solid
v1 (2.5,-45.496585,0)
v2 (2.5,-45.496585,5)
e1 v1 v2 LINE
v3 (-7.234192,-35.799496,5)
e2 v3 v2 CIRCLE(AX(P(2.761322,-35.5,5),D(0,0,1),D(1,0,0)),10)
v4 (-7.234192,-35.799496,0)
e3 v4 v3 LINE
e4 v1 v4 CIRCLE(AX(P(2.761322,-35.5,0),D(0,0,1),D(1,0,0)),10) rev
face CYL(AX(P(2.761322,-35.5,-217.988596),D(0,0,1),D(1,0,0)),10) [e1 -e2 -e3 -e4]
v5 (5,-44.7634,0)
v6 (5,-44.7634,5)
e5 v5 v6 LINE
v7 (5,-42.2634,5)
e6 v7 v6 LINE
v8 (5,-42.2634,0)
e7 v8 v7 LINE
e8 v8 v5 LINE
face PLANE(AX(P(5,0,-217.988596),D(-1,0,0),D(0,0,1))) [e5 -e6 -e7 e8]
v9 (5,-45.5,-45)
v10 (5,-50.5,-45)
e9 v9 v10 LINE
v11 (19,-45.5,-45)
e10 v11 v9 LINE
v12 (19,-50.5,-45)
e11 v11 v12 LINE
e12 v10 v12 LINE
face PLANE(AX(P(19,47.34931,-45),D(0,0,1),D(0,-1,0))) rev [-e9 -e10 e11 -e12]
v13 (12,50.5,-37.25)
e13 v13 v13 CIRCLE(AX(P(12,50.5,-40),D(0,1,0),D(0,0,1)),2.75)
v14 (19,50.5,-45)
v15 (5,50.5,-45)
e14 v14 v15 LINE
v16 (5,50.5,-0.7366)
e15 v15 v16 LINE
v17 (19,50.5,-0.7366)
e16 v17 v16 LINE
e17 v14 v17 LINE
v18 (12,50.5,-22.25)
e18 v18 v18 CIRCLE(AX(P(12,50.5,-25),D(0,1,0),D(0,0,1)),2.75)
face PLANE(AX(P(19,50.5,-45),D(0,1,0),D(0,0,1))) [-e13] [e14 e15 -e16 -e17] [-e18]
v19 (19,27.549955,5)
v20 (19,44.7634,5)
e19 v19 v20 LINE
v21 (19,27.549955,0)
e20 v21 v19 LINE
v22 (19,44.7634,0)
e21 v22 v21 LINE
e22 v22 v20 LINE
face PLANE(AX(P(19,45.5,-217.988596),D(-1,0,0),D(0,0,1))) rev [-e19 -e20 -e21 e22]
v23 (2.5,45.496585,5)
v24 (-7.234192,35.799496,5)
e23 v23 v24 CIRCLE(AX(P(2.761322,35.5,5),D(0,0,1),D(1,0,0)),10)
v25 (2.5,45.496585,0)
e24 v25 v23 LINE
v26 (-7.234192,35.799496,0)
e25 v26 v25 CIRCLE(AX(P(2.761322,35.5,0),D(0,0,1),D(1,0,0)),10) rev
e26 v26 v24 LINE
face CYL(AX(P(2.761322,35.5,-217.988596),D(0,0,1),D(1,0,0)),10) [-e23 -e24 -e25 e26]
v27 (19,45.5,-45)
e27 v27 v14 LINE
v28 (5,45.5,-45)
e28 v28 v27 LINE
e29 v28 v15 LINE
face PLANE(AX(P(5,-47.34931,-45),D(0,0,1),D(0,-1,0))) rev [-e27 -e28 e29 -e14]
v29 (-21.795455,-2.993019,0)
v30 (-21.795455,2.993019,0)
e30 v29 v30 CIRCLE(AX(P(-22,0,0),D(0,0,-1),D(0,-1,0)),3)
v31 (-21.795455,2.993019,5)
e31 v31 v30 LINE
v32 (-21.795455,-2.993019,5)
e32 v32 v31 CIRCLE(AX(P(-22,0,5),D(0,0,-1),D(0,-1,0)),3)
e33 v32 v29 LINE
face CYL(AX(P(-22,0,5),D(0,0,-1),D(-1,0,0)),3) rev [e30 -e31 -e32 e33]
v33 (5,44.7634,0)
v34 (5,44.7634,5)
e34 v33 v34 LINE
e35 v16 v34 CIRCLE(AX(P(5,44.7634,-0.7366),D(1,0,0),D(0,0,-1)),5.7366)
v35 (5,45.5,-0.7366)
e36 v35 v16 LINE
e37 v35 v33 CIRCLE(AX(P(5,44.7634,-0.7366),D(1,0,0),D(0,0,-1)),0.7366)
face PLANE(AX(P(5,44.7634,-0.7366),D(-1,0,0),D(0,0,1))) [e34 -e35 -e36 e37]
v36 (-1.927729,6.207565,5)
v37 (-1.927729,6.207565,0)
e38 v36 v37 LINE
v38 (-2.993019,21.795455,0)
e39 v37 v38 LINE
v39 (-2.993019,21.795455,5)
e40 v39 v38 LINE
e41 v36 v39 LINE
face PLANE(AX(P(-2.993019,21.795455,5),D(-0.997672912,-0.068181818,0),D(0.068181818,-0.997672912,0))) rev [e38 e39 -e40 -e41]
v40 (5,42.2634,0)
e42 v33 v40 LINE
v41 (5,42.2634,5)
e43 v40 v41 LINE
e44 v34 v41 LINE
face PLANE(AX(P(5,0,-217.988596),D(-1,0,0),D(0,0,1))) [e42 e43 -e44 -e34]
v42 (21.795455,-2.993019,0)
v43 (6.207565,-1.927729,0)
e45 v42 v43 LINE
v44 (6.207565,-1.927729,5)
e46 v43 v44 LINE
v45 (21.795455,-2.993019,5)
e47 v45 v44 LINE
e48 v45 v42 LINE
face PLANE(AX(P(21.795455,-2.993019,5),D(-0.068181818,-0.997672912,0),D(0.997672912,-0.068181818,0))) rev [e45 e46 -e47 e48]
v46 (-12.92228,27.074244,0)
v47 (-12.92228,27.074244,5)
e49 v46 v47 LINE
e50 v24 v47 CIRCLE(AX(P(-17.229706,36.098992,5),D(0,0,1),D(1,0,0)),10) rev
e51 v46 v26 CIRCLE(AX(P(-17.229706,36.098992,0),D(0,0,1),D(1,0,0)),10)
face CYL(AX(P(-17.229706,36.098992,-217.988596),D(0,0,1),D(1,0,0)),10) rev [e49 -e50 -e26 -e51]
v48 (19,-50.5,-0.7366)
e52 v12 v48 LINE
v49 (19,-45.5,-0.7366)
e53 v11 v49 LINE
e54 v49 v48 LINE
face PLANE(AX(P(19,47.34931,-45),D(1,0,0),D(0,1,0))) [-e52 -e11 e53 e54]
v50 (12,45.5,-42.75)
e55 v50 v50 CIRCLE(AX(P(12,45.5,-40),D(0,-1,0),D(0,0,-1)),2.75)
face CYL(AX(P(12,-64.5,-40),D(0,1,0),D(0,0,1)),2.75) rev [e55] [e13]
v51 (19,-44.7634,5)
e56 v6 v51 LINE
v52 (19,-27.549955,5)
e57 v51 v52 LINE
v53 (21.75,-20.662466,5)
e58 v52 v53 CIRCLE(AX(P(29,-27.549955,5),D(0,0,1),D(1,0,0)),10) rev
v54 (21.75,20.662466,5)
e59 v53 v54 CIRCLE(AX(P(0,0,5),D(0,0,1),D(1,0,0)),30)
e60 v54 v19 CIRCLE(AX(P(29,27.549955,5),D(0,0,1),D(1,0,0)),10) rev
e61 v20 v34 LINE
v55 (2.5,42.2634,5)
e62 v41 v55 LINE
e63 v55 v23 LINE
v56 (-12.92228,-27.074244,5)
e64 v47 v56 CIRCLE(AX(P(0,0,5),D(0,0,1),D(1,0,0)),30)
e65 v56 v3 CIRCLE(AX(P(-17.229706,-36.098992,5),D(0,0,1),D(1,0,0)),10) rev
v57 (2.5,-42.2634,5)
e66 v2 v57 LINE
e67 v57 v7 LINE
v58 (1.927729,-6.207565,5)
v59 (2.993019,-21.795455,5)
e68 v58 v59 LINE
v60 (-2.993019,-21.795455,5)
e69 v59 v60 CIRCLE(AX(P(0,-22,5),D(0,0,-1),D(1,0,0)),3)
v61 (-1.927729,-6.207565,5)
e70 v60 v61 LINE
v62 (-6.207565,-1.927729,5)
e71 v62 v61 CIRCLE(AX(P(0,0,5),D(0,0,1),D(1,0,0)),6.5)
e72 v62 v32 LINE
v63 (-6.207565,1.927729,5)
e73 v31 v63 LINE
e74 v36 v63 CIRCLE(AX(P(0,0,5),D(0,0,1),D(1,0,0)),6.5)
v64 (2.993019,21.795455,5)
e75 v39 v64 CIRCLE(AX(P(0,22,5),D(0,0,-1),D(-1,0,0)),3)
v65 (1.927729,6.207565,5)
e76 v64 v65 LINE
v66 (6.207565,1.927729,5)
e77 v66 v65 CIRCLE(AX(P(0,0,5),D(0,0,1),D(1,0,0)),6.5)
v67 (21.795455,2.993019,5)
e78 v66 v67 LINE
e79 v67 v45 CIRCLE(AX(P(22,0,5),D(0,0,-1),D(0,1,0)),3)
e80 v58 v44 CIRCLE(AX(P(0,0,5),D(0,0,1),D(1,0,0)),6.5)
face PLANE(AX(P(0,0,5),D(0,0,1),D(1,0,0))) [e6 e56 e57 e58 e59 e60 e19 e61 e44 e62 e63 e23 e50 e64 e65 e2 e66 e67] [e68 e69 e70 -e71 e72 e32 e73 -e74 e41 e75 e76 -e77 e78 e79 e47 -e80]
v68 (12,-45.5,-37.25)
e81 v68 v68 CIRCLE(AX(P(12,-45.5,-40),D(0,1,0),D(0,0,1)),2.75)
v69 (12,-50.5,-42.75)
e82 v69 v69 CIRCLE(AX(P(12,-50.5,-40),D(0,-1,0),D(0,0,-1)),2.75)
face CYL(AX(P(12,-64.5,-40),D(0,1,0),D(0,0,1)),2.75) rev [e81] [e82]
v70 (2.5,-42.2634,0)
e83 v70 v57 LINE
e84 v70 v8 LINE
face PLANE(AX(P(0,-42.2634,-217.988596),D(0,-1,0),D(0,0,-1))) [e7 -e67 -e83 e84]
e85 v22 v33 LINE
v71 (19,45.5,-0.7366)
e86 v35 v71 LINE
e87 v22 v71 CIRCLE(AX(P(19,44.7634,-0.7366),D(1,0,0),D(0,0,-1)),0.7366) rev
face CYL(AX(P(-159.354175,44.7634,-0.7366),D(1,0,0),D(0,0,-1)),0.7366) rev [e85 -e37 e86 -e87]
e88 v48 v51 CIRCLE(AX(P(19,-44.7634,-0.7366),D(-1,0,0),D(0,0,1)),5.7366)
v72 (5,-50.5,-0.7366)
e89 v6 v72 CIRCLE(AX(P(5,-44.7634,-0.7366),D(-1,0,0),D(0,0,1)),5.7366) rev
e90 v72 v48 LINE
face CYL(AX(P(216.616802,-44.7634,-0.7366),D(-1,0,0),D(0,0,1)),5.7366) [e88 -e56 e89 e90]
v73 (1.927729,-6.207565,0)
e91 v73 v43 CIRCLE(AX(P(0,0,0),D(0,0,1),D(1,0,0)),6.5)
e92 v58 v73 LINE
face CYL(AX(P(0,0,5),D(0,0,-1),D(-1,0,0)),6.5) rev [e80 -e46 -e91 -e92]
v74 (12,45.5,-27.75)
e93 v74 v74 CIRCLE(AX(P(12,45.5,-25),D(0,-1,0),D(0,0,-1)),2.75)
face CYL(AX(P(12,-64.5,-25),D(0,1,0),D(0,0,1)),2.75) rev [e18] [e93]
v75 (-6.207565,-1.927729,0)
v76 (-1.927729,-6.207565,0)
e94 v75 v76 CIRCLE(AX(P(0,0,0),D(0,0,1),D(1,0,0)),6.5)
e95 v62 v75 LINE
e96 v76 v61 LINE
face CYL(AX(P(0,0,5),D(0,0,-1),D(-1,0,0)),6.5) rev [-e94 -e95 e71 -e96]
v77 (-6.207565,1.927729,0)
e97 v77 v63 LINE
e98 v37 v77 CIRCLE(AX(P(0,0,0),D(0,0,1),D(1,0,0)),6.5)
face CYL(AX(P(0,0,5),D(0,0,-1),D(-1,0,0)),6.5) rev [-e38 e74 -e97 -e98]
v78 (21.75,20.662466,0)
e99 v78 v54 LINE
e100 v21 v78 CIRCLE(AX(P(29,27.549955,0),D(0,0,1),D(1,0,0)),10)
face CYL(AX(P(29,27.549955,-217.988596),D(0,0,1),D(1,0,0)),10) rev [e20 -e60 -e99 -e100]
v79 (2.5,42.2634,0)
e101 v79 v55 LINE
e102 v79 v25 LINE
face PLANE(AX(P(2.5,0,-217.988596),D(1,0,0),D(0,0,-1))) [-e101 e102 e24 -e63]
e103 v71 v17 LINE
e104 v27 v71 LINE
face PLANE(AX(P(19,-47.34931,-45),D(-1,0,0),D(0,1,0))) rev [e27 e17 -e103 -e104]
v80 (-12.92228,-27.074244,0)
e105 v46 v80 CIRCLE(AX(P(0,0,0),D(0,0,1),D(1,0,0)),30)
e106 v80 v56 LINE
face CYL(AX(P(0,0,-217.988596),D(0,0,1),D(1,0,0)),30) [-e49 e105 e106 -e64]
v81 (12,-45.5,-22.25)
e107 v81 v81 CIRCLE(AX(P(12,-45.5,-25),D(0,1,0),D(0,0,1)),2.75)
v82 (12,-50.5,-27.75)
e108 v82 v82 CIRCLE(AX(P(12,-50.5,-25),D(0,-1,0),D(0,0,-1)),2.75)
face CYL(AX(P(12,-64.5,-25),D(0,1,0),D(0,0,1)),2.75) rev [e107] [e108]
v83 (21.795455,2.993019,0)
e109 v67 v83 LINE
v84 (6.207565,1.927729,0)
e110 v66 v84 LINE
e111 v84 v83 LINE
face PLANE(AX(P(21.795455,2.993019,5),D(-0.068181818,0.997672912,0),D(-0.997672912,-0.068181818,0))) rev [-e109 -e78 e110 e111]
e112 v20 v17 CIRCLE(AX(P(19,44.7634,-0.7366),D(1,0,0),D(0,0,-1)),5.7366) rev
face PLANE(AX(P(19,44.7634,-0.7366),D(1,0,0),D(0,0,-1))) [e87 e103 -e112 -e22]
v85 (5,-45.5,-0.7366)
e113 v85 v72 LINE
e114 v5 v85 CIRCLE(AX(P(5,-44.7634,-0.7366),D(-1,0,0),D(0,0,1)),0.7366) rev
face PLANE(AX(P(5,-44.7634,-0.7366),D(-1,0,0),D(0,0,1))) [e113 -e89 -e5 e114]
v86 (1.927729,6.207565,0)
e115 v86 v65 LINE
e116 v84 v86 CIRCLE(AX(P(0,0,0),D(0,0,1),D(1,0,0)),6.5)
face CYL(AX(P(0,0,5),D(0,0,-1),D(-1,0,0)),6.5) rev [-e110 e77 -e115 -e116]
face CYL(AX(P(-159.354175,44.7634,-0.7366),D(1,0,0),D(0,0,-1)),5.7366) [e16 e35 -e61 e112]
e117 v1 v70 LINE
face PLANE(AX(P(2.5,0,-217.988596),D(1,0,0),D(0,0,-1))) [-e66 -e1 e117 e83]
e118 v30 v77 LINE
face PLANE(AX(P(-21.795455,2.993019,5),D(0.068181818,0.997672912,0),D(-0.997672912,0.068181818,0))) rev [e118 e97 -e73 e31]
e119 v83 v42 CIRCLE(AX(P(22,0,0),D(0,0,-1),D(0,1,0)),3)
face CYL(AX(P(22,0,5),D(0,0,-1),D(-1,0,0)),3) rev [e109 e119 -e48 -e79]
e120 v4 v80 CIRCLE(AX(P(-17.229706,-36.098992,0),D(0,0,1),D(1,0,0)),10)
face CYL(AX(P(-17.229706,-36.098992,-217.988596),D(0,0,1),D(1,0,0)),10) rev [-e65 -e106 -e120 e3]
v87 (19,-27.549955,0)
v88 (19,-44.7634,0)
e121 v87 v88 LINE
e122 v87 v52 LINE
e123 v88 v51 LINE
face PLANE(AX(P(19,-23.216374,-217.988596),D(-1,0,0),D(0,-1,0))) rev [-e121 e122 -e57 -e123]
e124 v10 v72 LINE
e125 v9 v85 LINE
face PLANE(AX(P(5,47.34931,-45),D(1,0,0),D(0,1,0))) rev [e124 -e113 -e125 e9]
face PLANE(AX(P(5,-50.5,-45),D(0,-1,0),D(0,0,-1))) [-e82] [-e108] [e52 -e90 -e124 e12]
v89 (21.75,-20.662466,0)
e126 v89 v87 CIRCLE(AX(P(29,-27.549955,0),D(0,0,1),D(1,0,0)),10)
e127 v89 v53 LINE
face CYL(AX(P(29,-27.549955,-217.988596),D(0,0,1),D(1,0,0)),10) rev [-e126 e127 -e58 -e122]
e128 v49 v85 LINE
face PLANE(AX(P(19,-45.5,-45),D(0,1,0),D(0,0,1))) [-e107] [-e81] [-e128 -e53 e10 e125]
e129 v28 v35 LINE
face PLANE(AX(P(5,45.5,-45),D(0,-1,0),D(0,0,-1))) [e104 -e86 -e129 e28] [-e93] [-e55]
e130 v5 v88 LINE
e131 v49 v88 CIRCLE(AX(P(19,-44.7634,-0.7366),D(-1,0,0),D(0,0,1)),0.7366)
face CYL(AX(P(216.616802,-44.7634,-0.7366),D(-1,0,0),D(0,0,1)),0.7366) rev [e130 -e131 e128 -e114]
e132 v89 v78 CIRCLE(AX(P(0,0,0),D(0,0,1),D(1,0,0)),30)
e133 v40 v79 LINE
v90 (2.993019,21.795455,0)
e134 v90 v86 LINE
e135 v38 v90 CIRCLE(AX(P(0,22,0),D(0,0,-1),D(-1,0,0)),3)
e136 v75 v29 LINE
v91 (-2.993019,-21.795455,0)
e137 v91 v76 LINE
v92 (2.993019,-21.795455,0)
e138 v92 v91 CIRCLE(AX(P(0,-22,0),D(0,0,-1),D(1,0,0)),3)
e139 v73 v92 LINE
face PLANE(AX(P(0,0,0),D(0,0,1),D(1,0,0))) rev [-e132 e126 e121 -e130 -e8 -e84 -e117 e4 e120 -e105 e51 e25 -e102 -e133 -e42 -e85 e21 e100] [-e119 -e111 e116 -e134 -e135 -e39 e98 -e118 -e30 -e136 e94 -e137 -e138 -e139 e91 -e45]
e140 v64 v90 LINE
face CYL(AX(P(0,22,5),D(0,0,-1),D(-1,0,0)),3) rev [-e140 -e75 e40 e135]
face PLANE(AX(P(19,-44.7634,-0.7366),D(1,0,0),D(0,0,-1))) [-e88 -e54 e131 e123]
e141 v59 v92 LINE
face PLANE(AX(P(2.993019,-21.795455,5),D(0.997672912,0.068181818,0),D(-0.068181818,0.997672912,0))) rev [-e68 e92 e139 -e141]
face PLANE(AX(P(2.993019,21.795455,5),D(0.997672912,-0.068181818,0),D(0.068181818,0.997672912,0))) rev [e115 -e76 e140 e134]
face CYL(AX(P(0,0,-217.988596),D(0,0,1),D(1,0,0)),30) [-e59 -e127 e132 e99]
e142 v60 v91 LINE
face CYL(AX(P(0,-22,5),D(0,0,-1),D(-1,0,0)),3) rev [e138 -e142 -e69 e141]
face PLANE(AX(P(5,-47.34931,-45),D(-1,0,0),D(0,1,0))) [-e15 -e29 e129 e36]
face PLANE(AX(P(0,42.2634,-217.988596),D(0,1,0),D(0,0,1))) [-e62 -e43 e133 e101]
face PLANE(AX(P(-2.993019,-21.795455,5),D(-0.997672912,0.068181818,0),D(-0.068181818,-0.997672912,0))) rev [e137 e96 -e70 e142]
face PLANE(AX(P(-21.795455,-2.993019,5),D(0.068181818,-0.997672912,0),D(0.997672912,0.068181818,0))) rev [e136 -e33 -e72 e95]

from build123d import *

# Parameters (mm, degrees)
SKETCH1_R                  = 6.5
BOSS_EXTRUDE1_DEPTH        = 5
SKETCH2_W                  = 14
SKETCH2_H                  = 5
BOSS_EXTRUDE2_DEPTH        = 50
SKETCH3_R                  = 2.75
CUT_EXTRUDE1_DEPTH         = 115
FILLET2_R                  = 10
CUT_EXTRUDE2_DEPTH         = 74.994932259
CIRPATTERN1_COUNT          = 4
BOSS_EXTRUDE5_START        = -5
BOSS_EXTRUDE5_DEPTH        = 5
FILLET5_R                  = 10
FILLET6_R                  = 10
FLATTEN_BENDS6_START       = -45
FLATTEN_BENDS6_OUTLINE_W   = 14
FLATTEN_BENDS6_OUTLINE_H   = 5
FLATTEN_BENDS6_DEPTH       = 45
FLATTEN_BENDS6_2_DEPTH     = 5
FLATTEN_BENDS6_3_OUTLINE_W = 14
FLATTEN_BENDS6_3_OUTLINE_H = 43.610839391
FLATTEN_BENDS6_3_OUTLINE_R = 2.75
FLATTEN_BENDS6_3_DEPTH     = 5
PROCESS_BENDS6_START       = -94.110839391
PROCESS_BENDS6_OUTLINE_W   = 14
PROCESS_BENDS6_OUTLINE_H   = 5
PROCESS_BENDS6_DEPTH       = 43.610839391
PROCESS_BENDS6_START_2     = 50.5
PROCESS_BENDS6_2_OUTLINE_W = 14
PROCESS_BENDS6_2_OUTLINE_H = 5
PROCESS_BENDS6_2_DEPTH     = 43.610839391
PROCESS_BENDS6_START_3     = -49.958579692
PROCESS_BENDS6_3_OUTLINE_W = 14
PROCESS_BENDS6_3_OUTLINE_H = 45
PROCESS_BENDS6_3_OUTLINE_R = 2.75
PROCESS_BENDS6_3_DEPTH     = 4.458579692
PROCESS_BENDS6_START_4     = 45.5
PROCESS_BENDS6_4_OUTLINE_W = 14
PROCESS_BENDS6_4_OUTLINE_H = 45
PROCESS_BENDS6_4_OUTLINE_R = 2.75
PROCESS_BENDS6_4_DEPTH     = 4.394100308
PROCESS_BENDS6_START_5     = 44.7634
PROCESS_BENDS6_5_OUTLINE_W = 14
PROCESS_BENDS6_5_OUTLINE_H = 45
PROCESS_BENDS6_5_OUTLINE_R = 2.75
PROCESS_BENDS6_5_DEPTH     = 5.7366
PROCESS_BENDS6_START_6     = -50.5
PROCESS_BENDS6_6_OUTLINE_W = 14
PROCESS_BENDS6_6_OUTLINE_H = 45
PROCESS_BENDS6_6_OUTLINE_R = 2.75
PROCESS_BENDS6_6_DEPTH     = 5.7366
PROCESS_BENDS6_START_7     = 5
PROCESS_BENDS6_7_DEPTH     = 14


with BuildPart() as part:
    # Sketch1 → Boss-Extrude1 (new body)
    with BuildSketch(Plane.XY):
        with BuildLine():
            Line((7.22970639, 29.115826375), (7.22970639, 45.5))
            Line((7.22970639, 45.5), (-7.22970639, 45.5))
            Line((-7.22970639, 45.5), (-7.22970639, 29.115826375))
            ThreePointArc((-7.22970639, 29.115826375), (-30, 0), (-7.22970639, -29.115826375))
            Line((-7.22970639, -29.115826375), (-7.22970639, -45.5))
            Line((-7.22970639, -45.5), (7.22970639, -45.5))
            Line((7.22970639, -45.5), (7.22970639, -29.115826375))
            ThreePointArc((7.22970639, -29.115826375), (30, 0), (7.22970639, 29.115826375))
        make_face()
        Circle(SKETCH1_R, mode=Mode.SUBTRACT)
    extrude(amount=BOSS_EXTRUDE1_DEPTH)

    # Sketch2 → Boss-Extrude2 (add)
    with BuildSketch(Plane.XY.offset(5)):
        with Locations((12, 48)):
            Rectangle(SKETCH2_W, SKETCH2_H)
        with Locations((12, -48)):
            Rectangle(SKETCH2_W, SKETCH2_H)
    extrude(amount=-BOSS_EXTRUDE2_DEPTH)

    # Sketch3 → Cut-Extrude1 (cut)
    with BuildSketch(Plane(origin=(0, 50.5, 0), x_dir=(1, 0, 0), z_dir=(0, 1, 0))):
        with Locations(Location((12, 40, 0), (0, 0, 270))):
            Circle(SKETCH3_R)
        with Locations(Location((12, 25, 0), (0, 0, 270))):
            Circle(SKETCH3_R)
    extrude(amount=-CUT_EXTRUDE1_DEPTH, mode=Mode.SUBTRACT)

    # Fillet2
    fillet2_edges = [part.edges().sort_by_distance(p)[0] for p in [
        (7.22970639, -29.115826375, 2.5),
        (-7.22970639, -29.115826375, 2.5),
        (-7.22970639, 29.115826375, 2.5),
        (7.22970639, 29.115826375, 2.5),
    ]]
    fillet(fillet2_edges, radius=FILLET2_R)

    # Sketch4 → Cut-Extrude2 (cut, through all)
    with BuildSketch(Plane(origin=(0, 0, 0), x_dir=(-1, 0, 0), z_dir=(0, 0, -1))):
        with BuildLine():
            Line((-2.993018736, 21.795454545), (-1.496509368, -0.102272727))
            ThreePointArc((-1.496509368, -0.102272727), (0, -1.5), (1.496509368, -0.102272727))
            Line((1.496509368, -0.102272727), (2.993018736, 21.795454545))
            ThreePointArc((2.993018736, 21.795454545), (0, 25), (-2.993018736, 21.795454545))
        make_face()
    cut_extrude2 = extrude(amount=-CUT_EXTRUDE2_DEPTH, mode=Mode.SUBTRACT)

    # CirPattern1: Cut-Extrude2 ×4 about axis
    cirpattern1_axis = Axis((0, 0, 0), (0, 0, 1))
    for i in range(1, CIRPATTERN1_COUNT):
        add(cut_extrude2.rotate(cirpattern1_axis, i * 360 / CIRPATTERN1_COUNT), mode=Mode.SUBTRACT)

    # Sketch41 → Boss-Extrude5 (add)
    with BuildSketch(Plane.XY.offset(5).offset(BOSS_EXTRUDE5_START)):
        with BuildLine():
            Line((7.22970639, 45.5), (19, 45.5))
            Line((19, 45.5), (19, 23.216373532))
            ThreePointArc((19, 23.216373532), (16.077275199, 25.32826923), (12.922279793, 27.074243941))
            ThreePointArc((12.922279793, 27.074243941), (8.771743693, 30.763931751), (7.22970639, 36.098991921))
            Line((7.22970639, 36.098991921), (7.22970639, 45.5))
        make_face()
        with BuildLine():
            Line((19, -45.5), (7.22970639, -45.5))
            Line((7.22970639, -45.5), (7.22970639, -36.098991921))
            ThreePointArc((7.22970639, -36.098991921), (8.771743693, -30.763931751), (12.922279793, -27.074243941))
            ThreePointArc((12.922279793, -27.074243941), (16.077275199, -25.32826923), (19, -23.216373532))
            Line((19, -23.216373532), (19, -45.5))
        make_face()
    extrude(amount=BOSS_EXTRUDE5_DEPTH)

    # Fillet5
    fillet5_edges = [part.edges().sort_by_distance(p)[0] for p in [
        (19, 23.216373532, 2.5),
        (19, -23.216373532, 2.5),
    ]]
    fillet(fillet5_edges, radius=FILLET5_R)

    # Fillet6
    fillet6_edges = [part.edges().sort_by_distance(p)[0] for p in [
        (-7.22970639, 45.5, 2.5),
        (-7.22970639, -45.5, 2.5),
    ]]
    fillet(fillet6_edges, radius=FILLET6_R)

    # Flatten-Bends6: read off the stored shape, not the designer's step
    # Flatten-Bends6 outline → Flatten-Bends6 (cut)
    with BuildSketch(Plane.XY.offset(FLATTEN_BENDS6_START)):
        with Locations((12, 48)):
            Rectangle(FLATTEN_BENDS6_OUTLINE_W, FLATTEN_BENDS6_OUTLINE_H)
        with Locations((12, -48)):
            Rectangle(FLATTEN_BENDS6_OUTLINE_W, FLATTEN_BENDS6_OUTLINE_H)
    extrude(amount=FLATTEN_BENDS6_DEPTH, mode=Mode.SUBTRACT)

    # Flatten-Bends6 2 outline → Flatten-Bends6 2 (cut)
    with BuildSketch(Plane.XY):
        with BuildLine():
            Line((5, 42.2634), (5, 45.5))
            Line((5, 45.5), (2.761321814, 45.5))
            ThreePointArc((2.761321814, 45.5), (2.63064975, 45.499146204), (2.5, 45.496584962))
            Line((2.5, 45.496584962), (2.5, 42.2634))
            Line((2.5, 42.2634), (5, 42.2634))
        make_face()
        with BuildLine():
            Line((5, -45.5), (5, -42.2634))
            Line((5, -42.2634), (2.5, -42.2634))
            Line((2.5, -42.2634), (2.5, -45.496584962))
            ThreePointArc((2.5, -45.496584962), (2.63064975, -45.499146204), (2.761321814, -45.5))
            Line((2.761321814, -45.5), (5, -45.5))
        make_face()
    extrude(amount=FLATTEN_BENDS6_2_DEPTH, mode=Mode.SUBTRACT)

    # Flatten-Bends6 3 outline → Flatten-Bends6 3 (add)
    # profile 1 of 2: a face of its own
    with BuildSketch(Plane.XY):
        with Locations((12, 72.305419696)):
            Rectangle(FLATTEN_BENDS6_3_OUTLINE_W, FLATTEN_BENDS6_3_OUTLINE_H)
        with Locations((12, 74.110839391)):
            Circle(FLATTEN_BENDS6_3_OUTLINE_R, mode=Mode.SUBTRACT)
        with Locations((12, 89.110839391)):
            Circle(FLATTEN_BENDS6_3_OUTLINE_R, mode=Mode.SUBTRACT)
    # profile 2 of 2: a face of its own
    with BuildSketch(Plane.XY):
        with Locations((12, -72.305419696)):
            Rectangle(FLATTEN_BENDS6_3_OUTLINE_W, FLATTEN_BENDS6_3_OUTLINE_H)
        with Locations((12, -89.110839391)):
            Circle(FLATTEN_BENDS6_3_OUTLINE_R, mode=Mode.SUBTRACT)
        with Locations((12, -74.110839391)):
            Circle(FLATTEN_BENDS6_3_OUTLINE_R, mode=Mode.SUBTRACT)
    extrude(amount=FLATTEN_BENDS6_3_DEPTH)

    # Process-Bends6: read off the stored shape, not the designer's step
    # Process-Bends6 outline → Process-Bends6 (cut)
    with BuildSketch(Plane(origin=(0, 0, 0), x_dir=(1, 0, 0), z_dir=(0, 1, 0)).offset(PROCESS_BENDS6_START)):
        with Locations((12, -2.5)):
            Rectangle(PROCESS_BENDS6_OUTLINE_W, PROCESS_BENDS6_OUTLINE_H)
    extrude(amount=PROCESS_BENDS6_DEPTH, mode=Mode.SUBTRACT)

    # Process-Bends6 2 outline → Process-Bends6 2 (cut)
    with BuildSketch(Plane(origin=(0, 0, 0), x_dir=(1, 0, 0), z_dir=(0, 1, 0)).offset(PROCESS_BENDS6_START_2)):
        with Locations((12, -2.5)):
            Rectangle(PROCESS_BENDS6_2_OUTLINE_W, PROCESS_BENDS6_2_OUTLINE_H)
    extrude(amount=PROCESS_BENDS6_2_DEPTH, mode=Mode.SUBTRACT)

    # Process-Bends6 3 outline → Process-Bends6 3 (add)
    with BuildSketch(Plane(origin=(0, 0, 0), x_dir=(1, 0, 0), z_dir=(0, 1, 0)).offset(PROCESS_BENDS6_START_3)):
        with Locations((12, 22.5)):
            Rectangle(PROCESS_BENDS6_3_OUTLINE_W, PROCESS_BENDS6_3_OUTLINE_H)
        with Locations((12, 25)):
            Circle(PROCESS_BENDS6_3_OUTLINE_R, mode=Mode.SUBTRACT)
        with Locations((12, 40)):
            Circle(PROCESS_BENDS6_3_OUTLINE_R, mode=Mode.SUBTRACT)
    extrude(amount=PROCESS_BENDS6_3_DEPTH)

    # Process-Bends6 4 outline → Process-Bends6 4 (add)
    with BuildSketch(Plane(origin=(0, 0, 0), x_dir=(1, 0, 0), z_dir=(0, 1, 0)).offset(PROCESS_BENDS6_START_4)):
        with Locations((12, 22.5)):
            Rectangle(PROCESS_BENDS6_4_OUTLINE_W, PROCESS_BENDS6_4_OUTLINE_H)
        with Locations((12, 25)):
            Circle(PROCESS_BENDS6_4_OUTLINE_R, mode=Mode.SUBTRACT)
        with Locations((12, 40)):
            Circle(PROCESS_BENDS6_4_OUTLINE_R, mode=Mode.SUBTRACT)
    extrude(amount=PROCESS_BENDS6_4_DEPTH)

    # Process-Bends6 5 outline → Process-Bends6 5 (add)
    with BuildSketch(Plane(origin=(0, 0, 0), x_dir=(1, 0, 0), z_dir=(0, 1, 0)).offset(PROCESS_BENDS6_START_5)):
        with Locations((12, 22.5)):
            Rectangle(PROCESS_BENDS6_5_OUTLINE_W, PROCESS_BENDS6_5_OUTLINE_H)
        with Locations((12, 25)):
            Circle(PROCESS_BENDS6_5_OUTLINE_R, mode=Mode.SUBTRACT)
        with Locations((12, 40)):
            Circle(PROCESS_BENDS6_5_OUTLINE_R, mode=Mode.SUBTRACT)
    extrude(amount=PROCESS_BENDS6_5_DEPTH)

    # Process-Bends6 6 outline → Process-Bends6 6 (add)
    with BuildSketch(Plane(origin=(0, 0, 0), x_dir=(1, 0, 0), z_dir=(0, 1, 0)).offset(PROCESS_BENDS6_START_6)):
        with Locations((12, 22.5)):
            Rectangle(PROCESS_BENDS6_6_OUTLINE_W, PROCESS_BENDS6_6_OUTLINE_H)
        with Locations((12, 25)):
            Circle(PROCESS_BENDS6_6_OUTLINE_R, mode=Mode.SUBTRACT)
        with Locations((12, 40)):
            Circle(PROCESS_BENDS6_6_OUTLINE_R, mode=Mode.SUBTRACT)
    extrude(amount=PROCESS_BENDS6_6_DEPTH)

    # Process-Bends6 7 outline → Process-Bends6 7 (cut)
    with BuildSketch(Plane.YZ.offset(PROCESS_BENDS6_START_7)):
        with BuildLine():
            Line((-45.5, -0.7366), (-45.5, -45))
            Line((-45.5, -45), (-44.7634, -45))
            Line((-44.7634, -45), (-44.7634, 0))
            ThreePointArc((-44.7634, 0), (-45.284254855, -0.215745145), (-45.5, -0.7366))
        make_face()
        with BuildLine():
            ThreePointArc((-50.5, -0.7366), (-48.819788761, 3.319788761), (-44.7634, 5))
            Line((-44.7634, 5), (-50.5, 5))
            Line((-50.5, 5), (-50.5, -0.7366))
        make_face()
        with BuildLine():
            ThreePointArc((44.7634, 5), (48.819788761, 3.319788761), (50.5, -0.7366))
            Line((50.5, -0.7366), (50.5, 5))
            Line((50.5, 5), (44.7634, 5))
        make_face()
        with BuildLine():
            Line((45.5, -45), (45.5, -0.7366))
            ThreePointArc((45.5, -0.7366), (45.284254855, -0.215745145), (44.7634, 0))
            Line((44.7634, 0), (44.7634, -45))
            Line((44.7634, -45), (45.5, -45))
        make_face()
    extrude(amount=PROCESS_BENDS6_7_DEPTH, mode=Mode.SUBTRACT)


solid = part.part
